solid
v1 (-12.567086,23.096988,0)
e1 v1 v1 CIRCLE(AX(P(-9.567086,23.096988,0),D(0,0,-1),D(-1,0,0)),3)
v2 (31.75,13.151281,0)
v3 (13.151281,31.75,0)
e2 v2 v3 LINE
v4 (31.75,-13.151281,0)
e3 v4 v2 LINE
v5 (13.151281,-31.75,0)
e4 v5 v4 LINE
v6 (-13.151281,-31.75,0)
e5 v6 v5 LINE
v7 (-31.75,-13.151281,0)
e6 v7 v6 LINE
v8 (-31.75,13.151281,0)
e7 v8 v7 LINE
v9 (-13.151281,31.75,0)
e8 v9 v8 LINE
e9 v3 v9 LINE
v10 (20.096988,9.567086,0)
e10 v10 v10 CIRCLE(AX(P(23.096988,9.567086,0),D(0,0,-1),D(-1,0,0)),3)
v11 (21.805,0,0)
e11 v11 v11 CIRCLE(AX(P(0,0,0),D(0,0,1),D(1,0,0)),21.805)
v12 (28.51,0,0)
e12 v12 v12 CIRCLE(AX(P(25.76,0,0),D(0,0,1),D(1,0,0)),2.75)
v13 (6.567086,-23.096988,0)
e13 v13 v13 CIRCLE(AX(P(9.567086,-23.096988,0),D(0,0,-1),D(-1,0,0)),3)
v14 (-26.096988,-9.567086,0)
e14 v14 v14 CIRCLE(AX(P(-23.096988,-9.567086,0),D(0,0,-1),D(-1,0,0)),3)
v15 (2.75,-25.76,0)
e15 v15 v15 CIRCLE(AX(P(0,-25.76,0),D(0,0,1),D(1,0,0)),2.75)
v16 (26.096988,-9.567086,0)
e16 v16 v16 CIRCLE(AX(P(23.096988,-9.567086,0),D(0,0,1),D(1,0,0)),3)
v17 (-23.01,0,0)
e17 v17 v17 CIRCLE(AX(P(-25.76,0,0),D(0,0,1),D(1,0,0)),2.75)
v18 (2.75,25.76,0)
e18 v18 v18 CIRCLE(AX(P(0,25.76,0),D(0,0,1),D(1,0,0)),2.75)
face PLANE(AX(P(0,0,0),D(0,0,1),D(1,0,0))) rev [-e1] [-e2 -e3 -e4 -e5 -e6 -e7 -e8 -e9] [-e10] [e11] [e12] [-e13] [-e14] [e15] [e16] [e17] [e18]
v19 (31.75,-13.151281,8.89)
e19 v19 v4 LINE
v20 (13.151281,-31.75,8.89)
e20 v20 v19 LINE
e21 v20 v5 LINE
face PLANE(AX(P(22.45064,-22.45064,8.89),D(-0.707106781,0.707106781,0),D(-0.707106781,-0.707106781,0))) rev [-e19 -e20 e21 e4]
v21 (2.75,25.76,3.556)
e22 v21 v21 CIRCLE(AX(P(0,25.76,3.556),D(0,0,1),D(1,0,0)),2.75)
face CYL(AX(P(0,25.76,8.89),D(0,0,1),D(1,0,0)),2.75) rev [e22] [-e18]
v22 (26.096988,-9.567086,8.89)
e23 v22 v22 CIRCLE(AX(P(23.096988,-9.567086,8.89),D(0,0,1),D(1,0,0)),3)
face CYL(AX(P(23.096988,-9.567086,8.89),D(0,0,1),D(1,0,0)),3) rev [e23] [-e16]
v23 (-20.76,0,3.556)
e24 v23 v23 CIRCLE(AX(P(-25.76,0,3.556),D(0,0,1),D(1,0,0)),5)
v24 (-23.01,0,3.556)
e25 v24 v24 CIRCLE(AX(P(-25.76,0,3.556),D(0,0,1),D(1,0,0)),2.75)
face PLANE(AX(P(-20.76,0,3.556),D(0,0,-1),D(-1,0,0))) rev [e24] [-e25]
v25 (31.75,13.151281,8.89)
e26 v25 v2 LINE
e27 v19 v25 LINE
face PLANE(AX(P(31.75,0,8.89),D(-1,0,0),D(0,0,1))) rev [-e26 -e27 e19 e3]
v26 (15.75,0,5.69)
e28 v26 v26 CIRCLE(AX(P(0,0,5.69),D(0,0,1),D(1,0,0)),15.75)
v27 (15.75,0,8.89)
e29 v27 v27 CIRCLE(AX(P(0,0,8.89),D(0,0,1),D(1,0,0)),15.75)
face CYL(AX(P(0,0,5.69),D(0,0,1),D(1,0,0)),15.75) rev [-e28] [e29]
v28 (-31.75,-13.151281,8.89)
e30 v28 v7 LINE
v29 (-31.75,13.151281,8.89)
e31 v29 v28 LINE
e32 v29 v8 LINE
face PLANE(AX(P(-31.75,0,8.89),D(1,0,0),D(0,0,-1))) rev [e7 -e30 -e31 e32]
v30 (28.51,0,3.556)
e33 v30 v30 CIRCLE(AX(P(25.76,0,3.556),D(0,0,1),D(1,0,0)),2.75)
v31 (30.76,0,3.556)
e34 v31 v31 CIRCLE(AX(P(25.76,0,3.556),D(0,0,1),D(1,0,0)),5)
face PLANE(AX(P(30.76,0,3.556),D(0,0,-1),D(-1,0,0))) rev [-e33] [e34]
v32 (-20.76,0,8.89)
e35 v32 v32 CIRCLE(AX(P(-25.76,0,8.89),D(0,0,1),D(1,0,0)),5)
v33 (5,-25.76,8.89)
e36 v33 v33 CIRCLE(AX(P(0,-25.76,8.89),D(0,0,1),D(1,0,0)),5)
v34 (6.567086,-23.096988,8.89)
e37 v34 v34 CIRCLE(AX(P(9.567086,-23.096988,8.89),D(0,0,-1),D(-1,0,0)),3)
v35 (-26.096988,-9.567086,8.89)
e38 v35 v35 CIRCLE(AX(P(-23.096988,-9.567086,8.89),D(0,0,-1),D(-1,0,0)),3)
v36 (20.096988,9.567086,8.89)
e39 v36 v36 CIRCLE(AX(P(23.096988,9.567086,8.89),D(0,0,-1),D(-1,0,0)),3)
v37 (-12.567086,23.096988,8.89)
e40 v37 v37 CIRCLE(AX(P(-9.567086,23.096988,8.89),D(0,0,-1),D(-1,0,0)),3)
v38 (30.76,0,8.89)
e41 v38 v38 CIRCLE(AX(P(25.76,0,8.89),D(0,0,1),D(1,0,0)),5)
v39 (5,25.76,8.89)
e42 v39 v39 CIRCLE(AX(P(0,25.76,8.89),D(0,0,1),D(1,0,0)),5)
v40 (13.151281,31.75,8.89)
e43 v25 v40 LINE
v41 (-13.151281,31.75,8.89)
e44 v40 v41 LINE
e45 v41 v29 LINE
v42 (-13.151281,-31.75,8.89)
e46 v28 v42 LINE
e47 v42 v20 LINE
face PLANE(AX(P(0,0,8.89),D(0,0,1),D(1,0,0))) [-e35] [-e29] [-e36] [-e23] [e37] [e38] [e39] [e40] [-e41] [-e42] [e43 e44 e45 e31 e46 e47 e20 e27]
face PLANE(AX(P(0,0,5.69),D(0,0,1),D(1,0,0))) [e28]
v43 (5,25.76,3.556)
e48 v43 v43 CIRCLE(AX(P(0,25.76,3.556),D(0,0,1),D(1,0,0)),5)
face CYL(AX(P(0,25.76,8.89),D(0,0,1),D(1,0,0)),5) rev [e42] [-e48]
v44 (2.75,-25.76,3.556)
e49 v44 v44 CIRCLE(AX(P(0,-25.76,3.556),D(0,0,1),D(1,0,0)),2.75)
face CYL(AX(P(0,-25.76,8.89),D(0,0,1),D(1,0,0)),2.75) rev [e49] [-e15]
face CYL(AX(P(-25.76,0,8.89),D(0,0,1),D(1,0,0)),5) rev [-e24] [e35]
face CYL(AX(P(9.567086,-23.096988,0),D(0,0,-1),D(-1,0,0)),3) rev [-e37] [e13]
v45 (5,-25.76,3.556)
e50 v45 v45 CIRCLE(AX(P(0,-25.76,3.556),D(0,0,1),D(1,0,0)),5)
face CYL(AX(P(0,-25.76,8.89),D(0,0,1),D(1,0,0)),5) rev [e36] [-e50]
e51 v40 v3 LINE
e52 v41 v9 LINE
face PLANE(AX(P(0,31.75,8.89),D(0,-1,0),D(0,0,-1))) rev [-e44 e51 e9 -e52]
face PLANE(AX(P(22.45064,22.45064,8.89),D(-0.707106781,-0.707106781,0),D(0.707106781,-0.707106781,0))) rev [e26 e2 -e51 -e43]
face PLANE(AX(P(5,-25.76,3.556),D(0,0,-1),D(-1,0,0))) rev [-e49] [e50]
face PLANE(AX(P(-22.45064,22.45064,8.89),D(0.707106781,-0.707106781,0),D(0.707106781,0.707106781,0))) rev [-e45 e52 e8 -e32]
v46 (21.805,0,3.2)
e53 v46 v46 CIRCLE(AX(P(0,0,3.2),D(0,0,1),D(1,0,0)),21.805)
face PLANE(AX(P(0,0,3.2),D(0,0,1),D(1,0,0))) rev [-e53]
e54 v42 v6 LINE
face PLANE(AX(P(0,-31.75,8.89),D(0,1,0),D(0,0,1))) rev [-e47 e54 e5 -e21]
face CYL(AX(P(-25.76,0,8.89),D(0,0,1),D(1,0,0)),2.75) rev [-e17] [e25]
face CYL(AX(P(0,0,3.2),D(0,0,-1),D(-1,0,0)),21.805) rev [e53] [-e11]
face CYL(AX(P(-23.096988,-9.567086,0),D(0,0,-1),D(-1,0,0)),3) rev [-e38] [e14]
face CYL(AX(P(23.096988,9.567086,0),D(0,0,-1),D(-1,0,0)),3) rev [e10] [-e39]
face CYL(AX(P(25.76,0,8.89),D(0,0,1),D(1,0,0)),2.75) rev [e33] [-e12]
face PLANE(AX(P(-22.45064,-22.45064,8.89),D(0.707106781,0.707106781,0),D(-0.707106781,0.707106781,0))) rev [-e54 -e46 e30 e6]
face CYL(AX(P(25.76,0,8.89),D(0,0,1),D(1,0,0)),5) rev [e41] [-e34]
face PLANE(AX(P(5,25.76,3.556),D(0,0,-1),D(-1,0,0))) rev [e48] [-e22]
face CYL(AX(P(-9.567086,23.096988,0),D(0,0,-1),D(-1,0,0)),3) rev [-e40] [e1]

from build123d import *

# Parameters (mm, degrees)
BOSS_EXTRUDE1_DEPTH       = 8.89
SKETCH2_3_R               = 21.805
CUT_EXTRUDE1_DEPTH        = 3.2
ADVANCEDHOLE1_START       = 3.556
ADVANCEDHOLE1_OUTLINE_R   = 5
ADVANCEDHOLE1_DEPTH       = 5.334
ADVANCEDHOLE1_2_OUTLINE_R = 2.75
ADVANCEDHOLE1_2_DEPTH     = 3.556
SKETCH12_R                = 15.75
CUT_EXTRUDE2_DEPTH        = 3.2
ADVANCEDHOLE5_OUTLINE_R   = 3
ADVANCEDHOLE5_DEPTH       = 8.89
M6X1_0_TAPPED_HOLE1_D     = 6


# Read off the part's stored shape, not the designer's step: AdvancedHole1, AdvancedHole5
with BuildPart() as part:
    # Sketch2 → Boss-Extrude1 (new body)
    with BuildSketch(Plane.XY):
        Polygon((-13.151280605, 31.75), (-31.75, 13.151280605), (-31.75, -13.151280605), (-13.151280605, -31.75), (13.151280605, -31.75), (31.75, -13.151280605), (31.75, 13.151280605), (13.151280605, 31.75), align=None)
    extrude(amount=BOSS_EXTRUDE1_DEPTH)

    # Sketch2<3> → Cut-Extrude1 (cut)
    with BuildSketch(Plane.XY):
        Circle(SKETCH2_3_R)
    extrude(amount=CUT_EXTRUDE1_DEPTH, mode=Mode.SUBTRACT)

    # AdvancedHole1 outline → AdvancedHole1 (cut)
    with BuildSketch(Plane.XY.offset(ADVANCEDHOLE1_START)):
        with Locations((-25.76, 0)):
            Circle(ADVANCEDHOLE1_OUTLINE_R)
        with Locations((0, -25.76)):
            Circle(ADVANCEDHOLE1_OUTLINE_R)
        with Locations((25.76, 0)):
            Circle(ADVANCEDHOLE1_OUTLINE_R)
        with Locations((0, 25.76)):
            Circle(ADVANCEDHOLE1_OUTLINE_R)
    extrude(amount=ADVANCEDHOLE1_DEPTH, mode=Mode.SUBTRACT)

    # AdvancedHole1 2 outline → AdvancedHole1 2 (cut)
    with BuildSketch(Plane.XY):
        with Locations((-25.76, 0)):
            Circle(ADVANCEDHOLE1_2_OUTLINE_R)
        with Locations((0, -25.76)):
            Circle(ADVANCEDHOLE1_2_OUTLINE_R)
        with Locations((25.76, 0)):
            Circle(ADVANCEDHOLE1_2_OUTLINE_R)
        with Locations((0, 25.76)):
            Circle(ADVANCEDHOLE1_2_OUTLINE_R)
    extrude(amount=ADVANCEDHOLE1_2_DEPTH, mode=Mode.SUBTRACT)

    # Sketch12 → Cut-Extrude2 (cut)
    with BuildSketch(Plane.XY.offset(8.89)):
        Circle(SKETCH12_R)
    extrude(amount=-CUT_EXTRUDE2_DEPTH, mode=Mode.SUBTRACT)

    # AdvancedHole5 outline → AdvancedHole5 (cut)
    with BuildSketch(Plane.XY):
        with Locations((23.096988313, -9.567085809)):
            Circle(ADVANCEDHOLE5_OUTLINE_R)
    extrude(amount=ADVANCEDHOLE5_DEPTH, mode=Mode.SUBTRACT)

    # M6x1.0 Tapped Hole1 (through all)
    with Locations(Plane(origin=(-9.567085809, 23.096988313, 0), x_dir=(-1, 0, 0), z_dir=(0, 0, -1))):
        with Locations((0, 0), (-32.664074122, -13.529902504), (-19.134171618, -46.193976626), (13.529902504, -32.664074122)):
            Hole(M6X1_0_TAPPED_HOLE1_D / 2)


solid = part.part
